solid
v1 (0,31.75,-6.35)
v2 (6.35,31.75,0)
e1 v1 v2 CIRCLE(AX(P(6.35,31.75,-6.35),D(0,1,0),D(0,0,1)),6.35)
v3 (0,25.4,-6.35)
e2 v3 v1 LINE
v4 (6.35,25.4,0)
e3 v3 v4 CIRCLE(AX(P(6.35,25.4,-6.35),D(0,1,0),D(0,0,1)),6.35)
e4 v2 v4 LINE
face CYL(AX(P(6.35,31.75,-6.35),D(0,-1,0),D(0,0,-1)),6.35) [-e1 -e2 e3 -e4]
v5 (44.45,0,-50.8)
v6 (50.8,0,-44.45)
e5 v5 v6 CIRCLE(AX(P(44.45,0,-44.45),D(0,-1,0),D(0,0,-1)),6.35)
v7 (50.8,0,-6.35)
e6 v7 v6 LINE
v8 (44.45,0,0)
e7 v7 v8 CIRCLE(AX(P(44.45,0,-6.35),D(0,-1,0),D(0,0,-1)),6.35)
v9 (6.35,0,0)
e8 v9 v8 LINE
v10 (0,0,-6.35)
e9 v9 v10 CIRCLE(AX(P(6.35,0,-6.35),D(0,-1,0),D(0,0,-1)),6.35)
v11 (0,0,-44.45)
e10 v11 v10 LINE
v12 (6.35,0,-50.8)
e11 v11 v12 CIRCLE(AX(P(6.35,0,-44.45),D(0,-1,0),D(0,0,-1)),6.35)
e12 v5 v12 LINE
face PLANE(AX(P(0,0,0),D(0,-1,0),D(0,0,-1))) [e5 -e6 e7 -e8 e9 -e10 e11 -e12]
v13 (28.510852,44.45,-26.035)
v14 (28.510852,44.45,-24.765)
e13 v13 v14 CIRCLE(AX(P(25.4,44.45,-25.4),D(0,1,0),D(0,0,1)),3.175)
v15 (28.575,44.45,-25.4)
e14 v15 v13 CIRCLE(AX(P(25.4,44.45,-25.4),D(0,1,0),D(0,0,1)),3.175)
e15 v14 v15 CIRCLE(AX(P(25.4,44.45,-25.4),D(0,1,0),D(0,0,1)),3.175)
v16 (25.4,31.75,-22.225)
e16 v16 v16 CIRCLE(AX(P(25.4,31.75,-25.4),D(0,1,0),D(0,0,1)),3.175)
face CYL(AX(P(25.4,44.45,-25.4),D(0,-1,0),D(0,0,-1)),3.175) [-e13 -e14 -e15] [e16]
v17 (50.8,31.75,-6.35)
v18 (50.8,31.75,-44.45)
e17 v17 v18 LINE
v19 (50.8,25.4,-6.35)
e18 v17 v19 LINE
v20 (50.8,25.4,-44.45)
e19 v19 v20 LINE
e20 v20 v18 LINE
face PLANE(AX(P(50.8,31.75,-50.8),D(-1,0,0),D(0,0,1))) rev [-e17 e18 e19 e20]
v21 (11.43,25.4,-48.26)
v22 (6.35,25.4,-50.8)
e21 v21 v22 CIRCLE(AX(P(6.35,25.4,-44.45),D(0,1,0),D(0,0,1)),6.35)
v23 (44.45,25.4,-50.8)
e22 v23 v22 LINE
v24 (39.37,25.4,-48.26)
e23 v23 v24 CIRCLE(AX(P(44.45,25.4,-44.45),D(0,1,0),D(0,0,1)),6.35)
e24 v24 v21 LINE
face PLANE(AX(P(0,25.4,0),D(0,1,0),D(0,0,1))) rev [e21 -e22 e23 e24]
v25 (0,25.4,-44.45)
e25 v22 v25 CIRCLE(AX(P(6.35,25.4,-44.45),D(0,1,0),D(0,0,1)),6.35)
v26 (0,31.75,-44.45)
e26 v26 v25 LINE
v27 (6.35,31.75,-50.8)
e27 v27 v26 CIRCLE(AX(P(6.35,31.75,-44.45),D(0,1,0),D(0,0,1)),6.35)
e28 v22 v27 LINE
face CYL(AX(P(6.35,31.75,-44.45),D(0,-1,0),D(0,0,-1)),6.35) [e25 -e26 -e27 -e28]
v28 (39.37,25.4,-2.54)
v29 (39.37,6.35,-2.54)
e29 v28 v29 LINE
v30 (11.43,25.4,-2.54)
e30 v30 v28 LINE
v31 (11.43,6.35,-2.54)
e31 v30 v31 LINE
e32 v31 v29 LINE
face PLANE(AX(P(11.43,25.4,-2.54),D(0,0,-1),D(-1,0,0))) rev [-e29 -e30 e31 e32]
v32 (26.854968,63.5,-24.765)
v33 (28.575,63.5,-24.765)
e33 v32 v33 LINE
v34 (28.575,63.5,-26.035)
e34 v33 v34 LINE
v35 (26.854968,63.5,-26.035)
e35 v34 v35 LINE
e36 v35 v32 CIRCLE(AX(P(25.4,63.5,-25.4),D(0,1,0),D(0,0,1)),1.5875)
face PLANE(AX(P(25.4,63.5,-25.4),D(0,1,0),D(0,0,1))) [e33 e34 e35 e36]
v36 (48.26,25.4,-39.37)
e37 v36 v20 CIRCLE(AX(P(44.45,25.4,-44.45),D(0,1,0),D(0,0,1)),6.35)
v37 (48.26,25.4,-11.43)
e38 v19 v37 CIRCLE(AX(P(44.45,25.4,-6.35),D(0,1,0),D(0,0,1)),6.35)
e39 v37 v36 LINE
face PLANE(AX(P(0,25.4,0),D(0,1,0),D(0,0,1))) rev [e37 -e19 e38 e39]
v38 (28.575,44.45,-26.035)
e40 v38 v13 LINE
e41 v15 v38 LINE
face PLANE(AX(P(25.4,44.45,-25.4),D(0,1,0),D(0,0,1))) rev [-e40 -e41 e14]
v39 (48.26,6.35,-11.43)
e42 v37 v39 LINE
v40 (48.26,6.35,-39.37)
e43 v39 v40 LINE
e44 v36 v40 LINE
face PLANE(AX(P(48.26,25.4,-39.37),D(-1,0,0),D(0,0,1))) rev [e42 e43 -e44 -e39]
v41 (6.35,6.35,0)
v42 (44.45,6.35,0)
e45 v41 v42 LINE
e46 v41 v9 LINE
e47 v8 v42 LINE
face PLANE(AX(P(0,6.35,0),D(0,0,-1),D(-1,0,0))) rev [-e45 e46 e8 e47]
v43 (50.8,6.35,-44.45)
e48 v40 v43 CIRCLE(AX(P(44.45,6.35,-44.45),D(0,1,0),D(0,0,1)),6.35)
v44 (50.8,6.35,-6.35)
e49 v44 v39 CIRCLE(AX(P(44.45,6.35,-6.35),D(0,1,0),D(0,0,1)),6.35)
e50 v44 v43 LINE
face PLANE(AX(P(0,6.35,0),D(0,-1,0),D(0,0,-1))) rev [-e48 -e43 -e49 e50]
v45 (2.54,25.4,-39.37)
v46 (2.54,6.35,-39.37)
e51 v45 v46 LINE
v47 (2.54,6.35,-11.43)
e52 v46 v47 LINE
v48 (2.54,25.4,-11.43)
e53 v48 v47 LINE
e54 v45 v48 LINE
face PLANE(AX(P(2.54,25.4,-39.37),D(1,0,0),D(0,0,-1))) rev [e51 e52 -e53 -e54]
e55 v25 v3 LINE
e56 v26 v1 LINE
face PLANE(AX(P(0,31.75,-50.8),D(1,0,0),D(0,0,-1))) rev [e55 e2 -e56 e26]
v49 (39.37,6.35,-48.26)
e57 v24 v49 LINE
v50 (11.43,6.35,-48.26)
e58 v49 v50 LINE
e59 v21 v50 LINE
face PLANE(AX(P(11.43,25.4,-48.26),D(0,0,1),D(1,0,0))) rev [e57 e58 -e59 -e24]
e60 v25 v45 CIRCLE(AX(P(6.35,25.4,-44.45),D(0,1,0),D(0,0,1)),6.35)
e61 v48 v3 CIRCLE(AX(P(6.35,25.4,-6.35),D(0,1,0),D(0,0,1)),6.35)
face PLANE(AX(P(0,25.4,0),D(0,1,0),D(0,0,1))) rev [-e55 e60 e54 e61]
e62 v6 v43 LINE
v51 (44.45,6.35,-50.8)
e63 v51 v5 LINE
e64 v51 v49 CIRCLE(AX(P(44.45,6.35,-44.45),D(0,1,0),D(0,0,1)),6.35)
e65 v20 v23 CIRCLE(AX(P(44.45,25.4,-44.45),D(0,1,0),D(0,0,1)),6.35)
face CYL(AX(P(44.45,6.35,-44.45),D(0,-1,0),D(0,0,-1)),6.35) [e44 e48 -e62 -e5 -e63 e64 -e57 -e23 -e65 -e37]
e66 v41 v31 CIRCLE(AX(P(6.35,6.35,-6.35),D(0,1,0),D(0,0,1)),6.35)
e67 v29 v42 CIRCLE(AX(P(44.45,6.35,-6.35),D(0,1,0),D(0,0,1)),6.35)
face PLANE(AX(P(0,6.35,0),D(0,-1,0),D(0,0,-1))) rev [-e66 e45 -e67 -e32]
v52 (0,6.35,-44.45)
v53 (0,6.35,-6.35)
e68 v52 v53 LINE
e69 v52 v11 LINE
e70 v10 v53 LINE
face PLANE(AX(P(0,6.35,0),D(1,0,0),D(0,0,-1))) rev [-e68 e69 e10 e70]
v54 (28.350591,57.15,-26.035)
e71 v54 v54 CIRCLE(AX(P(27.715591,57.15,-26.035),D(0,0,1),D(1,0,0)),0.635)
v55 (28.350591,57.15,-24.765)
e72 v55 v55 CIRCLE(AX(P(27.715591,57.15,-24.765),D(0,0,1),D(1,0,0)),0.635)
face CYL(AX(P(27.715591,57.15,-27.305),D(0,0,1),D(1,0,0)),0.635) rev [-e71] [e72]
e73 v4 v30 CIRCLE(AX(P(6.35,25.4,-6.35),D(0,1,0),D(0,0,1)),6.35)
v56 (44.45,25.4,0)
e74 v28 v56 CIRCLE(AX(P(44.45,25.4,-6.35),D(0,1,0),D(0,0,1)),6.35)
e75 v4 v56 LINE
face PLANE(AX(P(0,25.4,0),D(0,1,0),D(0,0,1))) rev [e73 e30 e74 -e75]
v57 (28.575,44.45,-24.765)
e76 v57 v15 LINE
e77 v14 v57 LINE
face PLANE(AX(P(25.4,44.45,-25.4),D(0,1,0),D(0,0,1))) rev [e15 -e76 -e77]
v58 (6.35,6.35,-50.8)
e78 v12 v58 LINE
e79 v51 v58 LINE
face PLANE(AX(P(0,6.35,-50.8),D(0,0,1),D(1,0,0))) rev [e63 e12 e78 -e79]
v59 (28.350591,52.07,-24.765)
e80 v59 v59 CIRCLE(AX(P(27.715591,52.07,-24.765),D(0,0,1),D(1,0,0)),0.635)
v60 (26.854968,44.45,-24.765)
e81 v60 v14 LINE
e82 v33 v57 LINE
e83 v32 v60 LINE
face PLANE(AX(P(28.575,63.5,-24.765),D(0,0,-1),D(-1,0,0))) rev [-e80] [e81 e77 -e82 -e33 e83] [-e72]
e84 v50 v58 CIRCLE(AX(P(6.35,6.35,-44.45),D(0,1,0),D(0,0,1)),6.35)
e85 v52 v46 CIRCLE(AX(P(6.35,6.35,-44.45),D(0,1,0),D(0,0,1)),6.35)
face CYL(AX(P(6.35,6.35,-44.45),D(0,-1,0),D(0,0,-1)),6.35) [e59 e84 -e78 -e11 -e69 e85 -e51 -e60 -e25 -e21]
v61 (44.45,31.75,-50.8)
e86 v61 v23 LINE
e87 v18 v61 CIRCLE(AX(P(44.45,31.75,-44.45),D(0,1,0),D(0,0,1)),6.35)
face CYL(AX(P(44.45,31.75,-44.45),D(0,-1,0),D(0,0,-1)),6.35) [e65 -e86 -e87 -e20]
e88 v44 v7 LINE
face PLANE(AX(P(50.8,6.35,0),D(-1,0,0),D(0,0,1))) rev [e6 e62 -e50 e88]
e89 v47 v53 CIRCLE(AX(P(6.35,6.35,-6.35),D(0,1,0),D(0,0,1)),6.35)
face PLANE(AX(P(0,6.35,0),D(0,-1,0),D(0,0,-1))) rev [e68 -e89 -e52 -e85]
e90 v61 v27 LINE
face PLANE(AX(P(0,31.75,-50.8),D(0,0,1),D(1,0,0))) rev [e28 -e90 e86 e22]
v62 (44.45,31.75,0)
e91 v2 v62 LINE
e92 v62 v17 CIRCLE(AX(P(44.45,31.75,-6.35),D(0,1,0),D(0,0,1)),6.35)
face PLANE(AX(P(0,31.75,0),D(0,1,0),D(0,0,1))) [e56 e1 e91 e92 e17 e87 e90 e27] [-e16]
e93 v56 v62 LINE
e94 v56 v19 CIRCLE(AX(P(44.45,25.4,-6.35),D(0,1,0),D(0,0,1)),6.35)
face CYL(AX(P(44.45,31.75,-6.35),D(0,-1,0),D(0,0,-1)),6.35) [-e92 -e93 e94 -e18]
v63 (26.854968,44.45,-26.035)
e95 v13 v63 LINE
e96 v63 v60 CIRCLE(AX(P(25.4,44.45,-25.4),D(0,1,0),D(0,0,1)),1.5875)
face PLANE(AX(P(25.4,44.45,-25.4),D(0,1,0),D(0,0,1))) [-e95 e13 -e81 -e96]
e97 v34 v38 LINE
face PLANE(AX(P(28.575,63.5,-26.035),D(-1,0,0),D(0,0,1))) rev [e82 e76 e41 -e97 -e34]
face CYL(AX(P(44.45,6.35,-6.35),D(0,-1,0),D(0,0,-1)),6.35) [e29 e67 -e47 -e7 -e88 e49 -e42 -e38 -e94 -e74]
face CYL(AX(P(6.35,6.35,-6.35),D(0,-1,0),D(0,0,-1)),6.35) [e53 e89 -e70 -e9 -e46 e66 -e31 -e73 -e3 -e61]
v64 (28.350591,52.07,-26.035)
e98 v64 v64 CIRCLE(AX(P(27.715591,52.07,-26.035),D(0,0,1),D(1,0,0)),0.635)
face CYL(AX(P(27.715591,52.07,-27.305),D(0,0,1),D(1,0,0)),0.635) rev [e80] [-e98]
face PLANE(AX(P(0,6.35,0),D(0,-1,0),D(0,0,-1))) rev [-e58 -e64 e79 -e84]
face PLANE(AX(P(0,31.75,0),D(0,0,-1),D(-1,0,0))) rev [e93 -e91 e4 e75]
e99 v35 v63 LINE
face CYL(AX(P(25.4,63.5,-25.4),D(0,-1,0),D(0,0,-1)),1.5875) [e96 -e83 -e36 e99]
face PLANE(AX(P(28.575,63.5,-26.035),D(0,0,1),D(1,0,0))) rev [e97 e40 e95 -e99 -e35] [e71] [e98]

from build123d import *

# Parameters (mm, degrees)
SKETCH1_W           = 50.8
SKETCH1_H           = 50.8
BOSS_EXTRUDE1_DEPTH = 6.35
FILLET1_R           = 6.35
BOSS_EXTRUDE2_START = 19.05
BOSS_EXTRUDE2_DEPTH = 19.05
SKETCH5_W           = 50.8
SKETCH5_H           = 50.8
BOSS_EXTRUDE3_DEPTH = 6.35
FILLET2_R           = 6.35
SKETCH6_R           = 3.175
BOSS_EXTRUDE4_DEPTH = 12.7
BOSS_EXTRUDE5_DEPTH = 19.05
SKETCH8_R           = 0.635
CUT_EXTRUDE2_DEPTH  = 2.54


with BuildPart() as part:
    # Sketch1 → Boss-Extrude1 (new body)
    with BuildSketch(Plane(origin=(0, 0, 0), x_dir=(1, 0, 0), z_dir=(0, 1, 0))):
        with Locations((25.4, 25.4)):
            Rectangle(SKETCH1_W, SKETCH1_H)
    extrude(amount=BOSS_EXTRUDE1_DEPTH)

    # Fillet1
    fillet1_edges = [part.edges().sort_by_distance(p)[0] for p in [
        (0, 3.175, -50.8),
        (50.8, 3.175, -50.8),
        (50.8, 3.175, 0),
        (0, 3.175, 0),
    ]]
    fillet(fillet1_edges, radius=FILLET1_R)

    # Sketch3 → Boss-Extrude2 (add)
    with BuildSketch(Plane(origin=(0, 6.35, 0), x_dir=(1, 0, 0), z_dir=(0, 1, 0)).offset(BOSS_EXTRUDE2_START)):
        with BuildLine():
            Line((11.43, 48.26), (39.37, 48.26))
            ThreePointArc((39.37, 48.26), (48.940128061, 48.940128061), (48.26, 39.37))
            Line((48.26, 39.37), (48.26, 11.43))
            ThreePointArc((48.26, 11.43), (48.940128061, 1.859871939), (39.37, 2.54))
            Line((39.37, 2.54), (11.43, 2.54))
            ThreePointArc((11.43, 2.54), (1.859871939, 1.859871939), (2.54, 11.43))
            Line((2.54, 11.43), (2.54, 39.37))
            ThreePointArc((2.54, 39.37), (1.859871939, 48.940128061), (11.43, 48.26))
        make_face()
    extrude(amount=-BOSS_EXTRUDE2_DEPTH)

    # Sketch5 → Boss-Extrude3 (add)
    with BuildSketch(Plane(origin=(0, 25.4, 0), x_dir=(1, 0, 0), z_dir=(0, 1, 0))):
        with Locations((25.4, 25.4)):
            Rectangle(SKETCH5_W, SKETCH5_H)
    extrude(amount=BOSS_EXTRUDE3_DEPTH)

    # Fillet2
    fillet2_edges = [part.edges().sort_by_distance(p)[0] for p in [
        (50.8, 28.575, -50.8),
        (0, 28.575, -50.8),
        (50.8, 28.575, 0),
        (0, 28.575, 0),
    ]]
    fillet(fillet2_edges, radius=FILLET2_R - 0.0001)  # a hair under: the kernel refuses the full size

    # Sketch6 → Boss-Extrude4 (add)
    with BuildSketch(Plane(origin=(0, 31.75, 0), x_dir=(1, 0, 0), z_dir=(0, 1, 0))):
        with Locations(Location((25.4, 25.4, 0), (0, 0, 270))):
            Circle(SKETCH6_R)
    extrude(amount=BOSS_EXTRUDE4_DEPTH)

    # Sketch7 → Boss-Extrude5 (add)
    with BuildSketch(Plane(origin=(0, 44.45, 0), x_dir=(1, 0, 0), z_dir=(0, 1, 0))):
        with BuildLine():
            Line((28.575, 26.035), (28.575, 24.765))
            Line((28.575, 24.765), (26.854967783, 24.765))
            ThreePointArc((26.854967783, 24.765), (23.8125, 25.4), (26.854967783, 26.035))
            Line((26.854967783, 26.035), (28.575, 26.035))
        make_face()
    extrude(amount=BOSS_EXTRUDE5_DEPTH)

    # Sketch8 → Cut-Extrude2 (cut)
    with BuildSketch(Plane.XY.offset(-24.765)):
        with Locations((27.715591, 52.07)):
            Circle(SKETCH8_R)
        with Locations((27.715591, 57.15)):
            Circle(SKETCH8_R)
    extrude(amount=-CUT_EXTRUDE2_DEPTH, mode=Mode.SUBTRACT)


solid = part.part
